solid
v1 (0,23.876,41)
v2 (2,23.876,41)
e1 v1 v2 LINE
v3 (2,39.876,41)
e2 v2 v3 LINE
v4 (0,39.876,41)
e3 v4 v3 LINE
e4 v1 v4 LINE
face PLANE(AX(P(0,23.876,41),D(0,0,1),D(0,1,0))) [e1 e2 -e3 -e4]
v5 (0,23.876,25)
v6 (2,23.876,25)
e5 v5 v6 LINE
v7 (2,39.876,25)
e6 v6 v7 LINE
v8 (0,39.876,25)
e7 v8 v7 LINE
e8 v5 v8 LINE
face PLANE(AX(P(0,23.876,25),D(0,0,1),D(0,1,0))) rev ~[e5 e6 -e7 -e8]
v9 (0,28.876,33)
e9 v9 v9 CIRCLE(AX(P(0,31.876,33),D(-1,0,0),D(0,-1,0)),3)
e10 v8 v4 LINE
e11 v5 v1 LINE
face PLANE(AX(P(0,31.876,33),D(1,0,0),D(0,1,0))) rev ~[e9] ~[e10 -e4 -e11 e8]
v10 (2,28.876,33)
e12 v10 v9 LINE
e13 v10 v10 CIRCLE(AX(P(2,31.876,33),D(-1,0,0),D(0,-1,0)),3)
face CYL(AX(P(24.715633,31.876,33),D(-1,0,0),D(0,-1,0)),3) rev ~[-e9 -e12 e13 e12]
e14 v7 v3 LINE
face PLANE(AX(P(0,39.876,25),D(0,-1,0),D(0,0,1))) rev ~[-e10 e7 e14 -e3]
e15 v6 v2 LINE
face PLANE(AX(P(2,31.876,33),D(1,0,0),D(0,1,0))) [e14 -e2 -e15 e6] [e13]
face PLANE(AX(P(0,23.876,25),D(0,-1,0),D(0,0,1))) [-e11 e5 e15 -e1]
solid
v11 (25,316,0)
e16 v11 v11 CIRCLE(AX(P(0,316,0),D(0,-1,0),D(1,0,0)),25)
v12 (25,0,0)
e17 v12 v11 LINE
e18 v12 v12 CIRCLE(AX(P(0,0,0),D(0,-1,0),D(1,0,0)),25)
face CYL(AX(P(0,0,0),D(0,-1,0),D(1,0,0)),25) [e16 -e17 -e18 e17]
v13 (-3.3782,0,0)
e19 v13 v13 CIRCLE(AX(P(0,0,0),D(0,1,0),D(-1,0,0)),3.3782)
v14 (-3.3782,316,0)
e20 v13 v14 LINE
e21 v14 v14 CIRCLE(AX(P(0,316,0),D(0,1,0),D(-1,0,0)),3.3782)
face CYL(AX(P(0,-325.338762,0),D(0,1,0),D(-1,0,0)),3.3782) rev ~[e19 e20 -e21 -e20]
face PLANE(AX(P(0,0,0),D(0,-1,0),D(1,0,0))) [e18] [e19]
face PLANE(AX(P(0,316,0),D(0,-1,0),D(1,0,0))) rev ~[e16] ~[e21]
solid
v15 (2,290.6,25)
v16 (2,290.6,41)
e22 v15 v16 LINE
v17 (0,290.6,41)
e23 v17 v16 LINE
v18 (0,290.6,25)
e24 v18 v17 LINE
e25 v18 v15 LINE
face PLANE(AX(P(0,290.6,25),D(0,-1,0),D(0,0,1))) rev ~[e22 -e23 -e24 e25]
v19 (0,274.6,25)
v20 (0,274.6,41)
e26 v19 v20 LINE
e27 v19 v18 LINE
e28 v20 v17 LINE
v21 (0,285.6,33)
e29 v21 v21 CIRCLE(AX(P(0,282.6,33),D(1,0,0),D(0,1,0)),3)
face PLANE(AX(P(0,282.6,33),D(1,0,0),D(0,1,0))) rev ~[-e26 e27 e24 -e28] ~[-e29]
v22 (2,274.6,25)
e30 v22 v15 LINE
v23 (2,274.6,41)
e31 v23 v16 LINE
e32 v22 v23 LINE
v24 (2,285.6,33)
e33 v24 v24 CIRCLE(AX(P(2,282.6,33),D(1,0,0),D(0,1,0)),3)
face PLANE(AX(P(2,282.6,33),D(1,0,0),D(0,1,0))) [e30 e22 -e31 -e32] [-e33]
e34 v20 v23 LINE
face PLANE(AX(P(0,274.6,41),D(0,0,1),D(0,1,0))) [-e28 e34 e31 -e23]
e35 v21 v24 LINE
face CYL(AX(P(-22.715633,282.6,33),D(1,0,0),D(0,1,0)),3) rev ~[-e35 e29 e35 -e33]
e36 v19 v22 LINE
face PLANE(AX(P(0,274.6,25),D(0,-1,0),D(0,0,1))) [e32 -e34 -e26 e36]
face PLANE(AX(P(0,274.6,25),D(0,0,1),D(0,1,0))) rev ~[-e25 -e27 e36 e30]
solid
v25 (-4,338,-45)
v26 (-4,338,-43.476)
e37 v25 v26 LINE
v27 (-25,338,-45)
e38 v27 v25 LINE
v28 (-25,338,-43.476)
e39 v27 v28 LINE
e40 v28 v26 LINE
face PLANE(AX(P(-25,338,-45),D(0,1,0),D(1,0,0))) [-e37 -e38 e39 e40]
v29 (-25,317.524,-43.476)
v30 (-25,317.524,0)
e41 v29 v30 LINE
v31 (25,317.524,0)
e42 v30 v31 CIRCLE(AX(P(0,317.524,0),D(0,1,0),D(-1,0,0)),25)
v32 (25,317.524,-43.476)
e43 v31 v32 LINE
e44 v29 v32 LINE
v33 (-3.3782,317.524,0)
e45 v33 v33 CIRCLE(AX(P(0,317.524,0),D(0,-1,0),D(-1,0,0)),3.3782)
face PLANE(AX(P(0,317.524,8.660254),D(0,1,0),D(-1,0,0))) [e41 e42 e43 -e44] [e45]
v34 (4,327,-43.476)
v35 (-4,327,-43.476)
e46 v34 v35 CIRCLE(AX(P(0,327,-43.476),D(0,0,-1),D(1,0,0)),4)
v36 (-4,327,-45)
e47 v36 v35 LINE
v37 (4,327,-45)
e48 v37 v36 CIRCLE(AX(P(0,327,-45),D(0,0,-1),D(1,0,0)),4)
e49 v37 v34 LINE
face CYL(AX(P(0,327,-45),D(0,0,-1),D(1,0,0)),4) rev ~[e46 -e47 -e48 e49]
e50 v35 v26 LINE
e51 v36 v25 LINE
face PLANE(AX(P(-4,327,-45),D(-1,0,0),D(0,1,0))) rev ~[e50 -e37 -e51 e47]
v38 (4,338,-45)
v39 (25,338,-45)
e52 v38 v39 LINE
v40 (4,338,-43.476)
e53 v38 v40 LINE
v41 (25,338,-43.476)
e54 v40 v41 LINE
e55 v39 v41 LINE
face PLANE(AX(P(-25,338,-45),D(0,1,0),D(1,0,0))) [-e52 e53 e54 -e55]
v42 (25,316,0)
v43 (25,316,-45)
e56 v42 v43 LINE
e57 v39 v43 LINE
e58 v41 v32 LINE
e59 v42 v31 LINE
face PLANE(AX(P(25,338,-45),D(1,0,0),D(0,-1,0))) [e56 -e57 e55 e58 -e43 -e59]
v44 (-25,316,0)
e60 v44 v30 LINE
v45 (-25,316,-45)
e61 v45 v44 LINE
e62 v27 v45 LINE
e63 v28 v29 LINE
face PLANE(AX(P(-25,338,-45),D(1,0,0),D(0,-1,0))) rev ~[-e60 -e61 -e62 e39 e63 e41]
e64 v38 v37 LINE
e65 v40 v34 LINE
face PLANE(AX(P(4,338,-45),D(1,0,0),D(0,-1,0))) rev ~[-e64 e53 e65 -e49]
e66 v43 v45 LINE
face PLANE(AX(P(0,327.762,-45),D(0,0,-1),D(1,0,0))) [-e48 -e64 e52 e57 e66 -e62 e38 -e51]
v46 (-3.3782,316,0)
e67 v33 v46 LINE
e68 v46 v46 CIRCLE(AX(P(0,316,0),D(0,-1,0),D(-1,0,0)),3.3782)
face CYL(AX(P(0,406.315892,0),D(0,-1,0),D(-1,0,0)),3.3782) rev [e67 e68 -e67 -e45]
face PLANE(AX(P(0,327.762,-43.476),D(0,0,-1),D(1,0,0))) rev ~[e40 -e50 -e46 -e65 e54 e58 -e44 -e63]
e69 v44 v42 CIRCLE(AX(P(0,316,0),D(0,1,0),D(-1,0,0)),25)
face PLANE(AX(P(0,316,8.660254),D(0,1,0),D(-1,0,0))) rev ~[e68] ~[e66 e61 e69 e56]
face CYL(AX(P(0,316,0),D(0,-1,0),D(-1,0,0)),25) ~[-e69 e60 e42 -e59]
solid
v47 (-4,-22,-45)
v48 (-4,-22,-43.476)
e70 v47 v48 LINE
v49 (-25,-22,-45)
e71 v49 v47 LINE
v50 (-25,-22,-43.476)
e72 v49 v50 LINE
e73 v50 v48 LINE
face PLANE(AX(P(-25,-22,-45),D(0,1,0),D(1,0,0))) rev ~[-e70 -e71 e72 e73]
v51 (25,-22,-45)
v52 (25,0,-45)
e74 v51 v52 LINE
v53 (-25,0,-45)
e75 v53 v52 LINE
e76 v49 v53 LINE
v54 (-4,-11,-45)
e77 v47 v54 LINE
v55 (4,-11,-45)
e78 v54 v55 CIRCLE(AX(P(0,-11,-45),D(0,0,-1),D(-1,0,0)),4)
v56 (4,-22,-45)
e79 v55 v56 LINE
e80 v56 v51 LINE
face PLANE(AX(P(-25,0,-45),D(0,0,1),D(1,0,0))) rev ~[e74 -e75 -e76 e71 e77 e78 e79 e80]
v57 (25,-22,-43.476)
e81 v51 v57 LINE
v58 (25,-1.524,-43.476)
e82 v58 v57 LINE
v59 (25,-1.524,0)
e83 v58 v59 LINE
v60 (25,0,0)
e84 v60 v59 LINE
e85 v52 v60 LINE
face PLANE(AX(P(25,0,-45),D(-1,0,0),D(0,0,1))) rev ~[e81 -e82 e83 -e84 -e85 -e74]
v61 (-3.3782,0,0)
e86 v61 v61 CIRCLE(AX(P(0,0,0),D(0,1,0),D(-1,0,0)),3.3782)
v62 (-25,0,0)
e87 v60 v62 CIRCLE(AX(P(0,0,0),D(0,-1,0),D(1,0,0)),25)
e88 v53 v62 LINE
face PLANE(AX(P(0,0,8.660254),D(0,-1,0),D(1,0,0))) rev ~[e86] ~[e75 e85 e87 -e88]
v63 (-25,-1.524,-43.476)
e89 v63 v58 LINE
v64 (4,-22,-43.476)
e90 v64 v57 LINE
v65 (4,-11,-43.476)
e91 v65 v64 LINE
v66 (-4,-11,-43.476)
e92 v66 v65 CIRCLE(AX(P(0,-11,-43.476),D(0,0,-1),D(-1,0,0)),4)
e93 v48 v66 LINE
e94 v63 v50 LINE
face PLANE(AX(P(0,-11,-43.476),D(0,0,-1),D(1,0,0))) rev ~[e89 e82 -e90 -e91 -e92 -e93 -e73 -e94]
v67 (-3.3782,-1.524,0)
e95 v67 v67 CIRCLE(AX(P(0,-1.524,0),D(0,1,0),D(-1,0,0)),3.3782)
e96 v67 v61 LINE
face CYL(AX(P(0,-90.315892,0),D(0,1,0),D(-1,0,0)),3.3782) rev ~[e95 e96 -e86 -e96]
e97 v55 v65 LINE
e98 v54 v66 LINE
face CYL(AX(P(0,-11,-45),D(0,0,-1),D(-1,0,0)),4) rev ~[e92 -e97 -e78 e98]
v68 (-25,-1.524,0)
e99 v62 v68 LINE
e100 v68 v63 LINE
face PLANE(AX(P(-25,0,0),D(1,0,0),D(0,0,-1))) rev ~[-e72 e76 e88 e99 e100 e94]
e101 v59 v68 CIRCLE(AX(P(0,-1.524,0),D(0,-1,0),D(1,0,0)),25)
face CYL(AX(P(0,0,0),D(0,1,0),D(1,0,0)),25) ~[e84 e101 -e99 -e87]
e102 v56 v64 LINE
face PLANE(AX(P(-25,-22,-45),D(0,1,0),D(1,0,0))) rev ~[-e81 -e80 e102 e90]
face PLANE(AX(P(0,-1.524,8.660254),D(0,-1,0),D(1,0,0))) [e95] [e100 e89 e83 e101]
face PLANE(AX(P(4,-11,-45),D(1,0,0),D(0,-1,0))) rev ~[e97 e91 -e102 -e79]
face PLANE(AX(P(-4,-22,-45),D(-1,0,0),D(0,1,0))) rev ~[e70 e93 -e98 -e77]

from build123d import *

# Parameters (mm, degrees)
F0_R      = 25
F1_DEPTH  = 316
F3_DEPTH  = 1.524
F4_W      = 50
F4_H      = 22
F5_DEPTH  = 1.524
F7_DEPTH  = 1.524
F9_DEPTH  = 1.524
F10_W     = 50
F10_H     = 20.476
F11_DEPTH = 1.524
F13_DEPTH = 1.524
F14_W     = 16
F14_H     = 16
F15_DEPTH = 2
F17_D     = 6
F18_W     = 16
F18_H     = 16
F19_DEPTH = 2
F21_D     = 6
F23_D     = 6.7564
F23_2_D   = 6.7564
F23_3_D   = 6.7564


# Not quite as in the source:
# - a pattern or mirror of a feature is missing from the dataset's text; its kind, count and spacing are read off the source's solid


with BuildPart() as f1:
    # F0 (on Front) → F1 (new body)
    with BuildSketch(Plane.XZ):
        Circle(F0_R)
    extrude(amount=-F1_DEPTH)

    # F23 (through all)
    with Locations(Plane.XZ.offset(1.524)):
        with Locations((0, 0)):
            Hole(F23_D / 2)


with BuildPart() as f3:
    # F2 (on Front) → F3 (new body)
    with BuildSketch(Plane.XZ):
        with BuildLine():
            Line((-25, 0), (25, 0))
            ThreePointArc((25, 0), (0, 25), (-25, 0))
        make_face()
        with BuildLine():
            Line((25, -45), (25, 0))
            ThreePointArc((25, 0), (0, -25), (-25, 0))
            Line((-25, 0), (-25, -45))
            Line((-25, -45), (25, -45))
        make_face()
        with BuildLine():
            ThreePointArc((-25, 0), (0, -25), (25, 0))
            Line((25, 0), (-25, 0))
        make_face()
    extrude(amount=F3_DEPTH)

    # F4 (on face) → F5 (join)
    with BuildSketch(Plane(origin=(0, 0, -45), x_dir=(1, 0, 0), z_dir=(0, 0, -1))):
        with Locations((0, 11)):
            Rectangle(F4_W, F4_H)
    extrude(amount=-F5_DEPTH)

    # F6 (on face) → F7 (cut)
    with BuildSketch(Plane(origin=(0, 0, -45), x_dir=(1, 0, 0), z_dir=(0, 0, -1))):
        with BuildLine():
            Line((-4, 11), (4, 11))
            ThreePointArc((4, 11), (0, 15), (-4, 11))
        make_face()
        with BuildLine():
            ThreePointArc((-4, 11), (0, 7), (4, 11))
            Line((4, 11), (-4, 11))
        make_face()
        with BuildLine():
            ThreePointArc((-4, 11), (0, 15), (4, 11))
            Line((4, 11), (4, 22))
            Line((4, 22), (-4, 22))
            Line((-4, 22), (-4, 11))
        make_face()
    extrude(amount=-F7_DEPTH, mode=Mode.SUBTRACT)

    # F23#2 (through all)
    with Locations(Plane.XZ.offset(1.524)):
        with Locations((0, 0)):
            Hole(F23_2_D / 2)


with BuildPart() as f9:
    # F8 (on face) → F9 (new body)
    with BuildSketch(Plane(origin=(0, 316, 0), x_dir=(-1, 0, 0), z_dir=(0, 1, 0))):
        with BuildLine():
            Line((-25, 0), (25, 0))
            ThreePointArc((25, 0), (0, 25), (-25, 0))
        make_face()
        with BuildLine():
            Line((25, -45), (25, 0))
            ThreePointArc((25, 0), (0, -25), (-25, 0))
            Line((-25, 0), (-25, -45))
            Line((-25, -45), (25, -45))
        make_face()
        with BuildLine():
            ThreePointArc((-25, 0), (0, -25), (25, 0))
            Line((25, 0), (-25, 0))
        make_face()
    extrude(amount=F9_DEPTH)

    # F10 (on face) → F11 (join)
    with BuildSketch(Plane(origin=(0, 0, -45), x_dir=(1, 0, 0), z_dir=(0, 0, -1))):
        with Locations((0, -327.762)):
            Rectangle(F10_W, F10_H)
    extrude(amount=-F11_DEPTH)

    # F12 (on face) → F13 (cut)
    with BuildSketch(Plane(origin=(0, 0, -45), x_dir=(1, 0, 0), z_dir=(0, 0, -1))):
        with BuildLine():
            Line((-4, -327), (4, -327))
            ThreePointArc((4, -327), (0, -323), (-4, -327))
        make_face()
        with BuildLine():
            Line((4, -338), (4, -327))
            ThreePointArc((4, -327), (0, -331), (-4, -327))
            Line((-4, -327), (-4, -338))
            Line((-4, -338), (4, -338))
        make_face()
        with BuildLine():
            ThreePointArc((-4, -327), (0, -331), (4, -327))
            Line((4, -327), (-4, -327))
        make_face()
    extrude(amount=-F13_DEPTH, mode=Mode.SUBTRACT)

    # F23#3 (through all)
    with Locations(Plane.XZ.offset(1.524)):
        with Locations((0, 0)):
            f23_3 = Hole(F23_3_D / 2)

    # F23_3_copies: F23#3 across plane
    add(f23_3.mirror(Plane.ZX.offset(158)), mode=Mode.SUBTRACT)


with BuildPart() as f15:
    # F14 (on Right) → F15 (new body)
    with BuildSketch(Plane.YZ):
        with Locations((31.876, 33)):
            Rectangle(F14_W, F14_H)
    extrude(amount=F15_DEPTH)

    # F17 (through all)
    with Locations(Plane.YZ.offset(2)):
        with Locations((31.876, 33)):
            Hole(F17_D / 2)


with BuildPart() as f19:
    # F18 (on Right) → F19 (new body)
    with BuildSketch(Plane.YZ):
        with Locations((282.6, 33)):
            Rectangle(F18_W, F18_H)
    extrude(amount=F19_DEPTH)

    # F21 (through all)
    with Locations(Plane(origin=(0, 0, 0), x_dir=(0, -1, 0), z_dir=(-1, 0, 0))):
        with Locations((-282.6, 33)):
            Hole(F21_D / 2)


solid = Compound([f1.part, f3.part, f9.part, f15.part, f19.part])
